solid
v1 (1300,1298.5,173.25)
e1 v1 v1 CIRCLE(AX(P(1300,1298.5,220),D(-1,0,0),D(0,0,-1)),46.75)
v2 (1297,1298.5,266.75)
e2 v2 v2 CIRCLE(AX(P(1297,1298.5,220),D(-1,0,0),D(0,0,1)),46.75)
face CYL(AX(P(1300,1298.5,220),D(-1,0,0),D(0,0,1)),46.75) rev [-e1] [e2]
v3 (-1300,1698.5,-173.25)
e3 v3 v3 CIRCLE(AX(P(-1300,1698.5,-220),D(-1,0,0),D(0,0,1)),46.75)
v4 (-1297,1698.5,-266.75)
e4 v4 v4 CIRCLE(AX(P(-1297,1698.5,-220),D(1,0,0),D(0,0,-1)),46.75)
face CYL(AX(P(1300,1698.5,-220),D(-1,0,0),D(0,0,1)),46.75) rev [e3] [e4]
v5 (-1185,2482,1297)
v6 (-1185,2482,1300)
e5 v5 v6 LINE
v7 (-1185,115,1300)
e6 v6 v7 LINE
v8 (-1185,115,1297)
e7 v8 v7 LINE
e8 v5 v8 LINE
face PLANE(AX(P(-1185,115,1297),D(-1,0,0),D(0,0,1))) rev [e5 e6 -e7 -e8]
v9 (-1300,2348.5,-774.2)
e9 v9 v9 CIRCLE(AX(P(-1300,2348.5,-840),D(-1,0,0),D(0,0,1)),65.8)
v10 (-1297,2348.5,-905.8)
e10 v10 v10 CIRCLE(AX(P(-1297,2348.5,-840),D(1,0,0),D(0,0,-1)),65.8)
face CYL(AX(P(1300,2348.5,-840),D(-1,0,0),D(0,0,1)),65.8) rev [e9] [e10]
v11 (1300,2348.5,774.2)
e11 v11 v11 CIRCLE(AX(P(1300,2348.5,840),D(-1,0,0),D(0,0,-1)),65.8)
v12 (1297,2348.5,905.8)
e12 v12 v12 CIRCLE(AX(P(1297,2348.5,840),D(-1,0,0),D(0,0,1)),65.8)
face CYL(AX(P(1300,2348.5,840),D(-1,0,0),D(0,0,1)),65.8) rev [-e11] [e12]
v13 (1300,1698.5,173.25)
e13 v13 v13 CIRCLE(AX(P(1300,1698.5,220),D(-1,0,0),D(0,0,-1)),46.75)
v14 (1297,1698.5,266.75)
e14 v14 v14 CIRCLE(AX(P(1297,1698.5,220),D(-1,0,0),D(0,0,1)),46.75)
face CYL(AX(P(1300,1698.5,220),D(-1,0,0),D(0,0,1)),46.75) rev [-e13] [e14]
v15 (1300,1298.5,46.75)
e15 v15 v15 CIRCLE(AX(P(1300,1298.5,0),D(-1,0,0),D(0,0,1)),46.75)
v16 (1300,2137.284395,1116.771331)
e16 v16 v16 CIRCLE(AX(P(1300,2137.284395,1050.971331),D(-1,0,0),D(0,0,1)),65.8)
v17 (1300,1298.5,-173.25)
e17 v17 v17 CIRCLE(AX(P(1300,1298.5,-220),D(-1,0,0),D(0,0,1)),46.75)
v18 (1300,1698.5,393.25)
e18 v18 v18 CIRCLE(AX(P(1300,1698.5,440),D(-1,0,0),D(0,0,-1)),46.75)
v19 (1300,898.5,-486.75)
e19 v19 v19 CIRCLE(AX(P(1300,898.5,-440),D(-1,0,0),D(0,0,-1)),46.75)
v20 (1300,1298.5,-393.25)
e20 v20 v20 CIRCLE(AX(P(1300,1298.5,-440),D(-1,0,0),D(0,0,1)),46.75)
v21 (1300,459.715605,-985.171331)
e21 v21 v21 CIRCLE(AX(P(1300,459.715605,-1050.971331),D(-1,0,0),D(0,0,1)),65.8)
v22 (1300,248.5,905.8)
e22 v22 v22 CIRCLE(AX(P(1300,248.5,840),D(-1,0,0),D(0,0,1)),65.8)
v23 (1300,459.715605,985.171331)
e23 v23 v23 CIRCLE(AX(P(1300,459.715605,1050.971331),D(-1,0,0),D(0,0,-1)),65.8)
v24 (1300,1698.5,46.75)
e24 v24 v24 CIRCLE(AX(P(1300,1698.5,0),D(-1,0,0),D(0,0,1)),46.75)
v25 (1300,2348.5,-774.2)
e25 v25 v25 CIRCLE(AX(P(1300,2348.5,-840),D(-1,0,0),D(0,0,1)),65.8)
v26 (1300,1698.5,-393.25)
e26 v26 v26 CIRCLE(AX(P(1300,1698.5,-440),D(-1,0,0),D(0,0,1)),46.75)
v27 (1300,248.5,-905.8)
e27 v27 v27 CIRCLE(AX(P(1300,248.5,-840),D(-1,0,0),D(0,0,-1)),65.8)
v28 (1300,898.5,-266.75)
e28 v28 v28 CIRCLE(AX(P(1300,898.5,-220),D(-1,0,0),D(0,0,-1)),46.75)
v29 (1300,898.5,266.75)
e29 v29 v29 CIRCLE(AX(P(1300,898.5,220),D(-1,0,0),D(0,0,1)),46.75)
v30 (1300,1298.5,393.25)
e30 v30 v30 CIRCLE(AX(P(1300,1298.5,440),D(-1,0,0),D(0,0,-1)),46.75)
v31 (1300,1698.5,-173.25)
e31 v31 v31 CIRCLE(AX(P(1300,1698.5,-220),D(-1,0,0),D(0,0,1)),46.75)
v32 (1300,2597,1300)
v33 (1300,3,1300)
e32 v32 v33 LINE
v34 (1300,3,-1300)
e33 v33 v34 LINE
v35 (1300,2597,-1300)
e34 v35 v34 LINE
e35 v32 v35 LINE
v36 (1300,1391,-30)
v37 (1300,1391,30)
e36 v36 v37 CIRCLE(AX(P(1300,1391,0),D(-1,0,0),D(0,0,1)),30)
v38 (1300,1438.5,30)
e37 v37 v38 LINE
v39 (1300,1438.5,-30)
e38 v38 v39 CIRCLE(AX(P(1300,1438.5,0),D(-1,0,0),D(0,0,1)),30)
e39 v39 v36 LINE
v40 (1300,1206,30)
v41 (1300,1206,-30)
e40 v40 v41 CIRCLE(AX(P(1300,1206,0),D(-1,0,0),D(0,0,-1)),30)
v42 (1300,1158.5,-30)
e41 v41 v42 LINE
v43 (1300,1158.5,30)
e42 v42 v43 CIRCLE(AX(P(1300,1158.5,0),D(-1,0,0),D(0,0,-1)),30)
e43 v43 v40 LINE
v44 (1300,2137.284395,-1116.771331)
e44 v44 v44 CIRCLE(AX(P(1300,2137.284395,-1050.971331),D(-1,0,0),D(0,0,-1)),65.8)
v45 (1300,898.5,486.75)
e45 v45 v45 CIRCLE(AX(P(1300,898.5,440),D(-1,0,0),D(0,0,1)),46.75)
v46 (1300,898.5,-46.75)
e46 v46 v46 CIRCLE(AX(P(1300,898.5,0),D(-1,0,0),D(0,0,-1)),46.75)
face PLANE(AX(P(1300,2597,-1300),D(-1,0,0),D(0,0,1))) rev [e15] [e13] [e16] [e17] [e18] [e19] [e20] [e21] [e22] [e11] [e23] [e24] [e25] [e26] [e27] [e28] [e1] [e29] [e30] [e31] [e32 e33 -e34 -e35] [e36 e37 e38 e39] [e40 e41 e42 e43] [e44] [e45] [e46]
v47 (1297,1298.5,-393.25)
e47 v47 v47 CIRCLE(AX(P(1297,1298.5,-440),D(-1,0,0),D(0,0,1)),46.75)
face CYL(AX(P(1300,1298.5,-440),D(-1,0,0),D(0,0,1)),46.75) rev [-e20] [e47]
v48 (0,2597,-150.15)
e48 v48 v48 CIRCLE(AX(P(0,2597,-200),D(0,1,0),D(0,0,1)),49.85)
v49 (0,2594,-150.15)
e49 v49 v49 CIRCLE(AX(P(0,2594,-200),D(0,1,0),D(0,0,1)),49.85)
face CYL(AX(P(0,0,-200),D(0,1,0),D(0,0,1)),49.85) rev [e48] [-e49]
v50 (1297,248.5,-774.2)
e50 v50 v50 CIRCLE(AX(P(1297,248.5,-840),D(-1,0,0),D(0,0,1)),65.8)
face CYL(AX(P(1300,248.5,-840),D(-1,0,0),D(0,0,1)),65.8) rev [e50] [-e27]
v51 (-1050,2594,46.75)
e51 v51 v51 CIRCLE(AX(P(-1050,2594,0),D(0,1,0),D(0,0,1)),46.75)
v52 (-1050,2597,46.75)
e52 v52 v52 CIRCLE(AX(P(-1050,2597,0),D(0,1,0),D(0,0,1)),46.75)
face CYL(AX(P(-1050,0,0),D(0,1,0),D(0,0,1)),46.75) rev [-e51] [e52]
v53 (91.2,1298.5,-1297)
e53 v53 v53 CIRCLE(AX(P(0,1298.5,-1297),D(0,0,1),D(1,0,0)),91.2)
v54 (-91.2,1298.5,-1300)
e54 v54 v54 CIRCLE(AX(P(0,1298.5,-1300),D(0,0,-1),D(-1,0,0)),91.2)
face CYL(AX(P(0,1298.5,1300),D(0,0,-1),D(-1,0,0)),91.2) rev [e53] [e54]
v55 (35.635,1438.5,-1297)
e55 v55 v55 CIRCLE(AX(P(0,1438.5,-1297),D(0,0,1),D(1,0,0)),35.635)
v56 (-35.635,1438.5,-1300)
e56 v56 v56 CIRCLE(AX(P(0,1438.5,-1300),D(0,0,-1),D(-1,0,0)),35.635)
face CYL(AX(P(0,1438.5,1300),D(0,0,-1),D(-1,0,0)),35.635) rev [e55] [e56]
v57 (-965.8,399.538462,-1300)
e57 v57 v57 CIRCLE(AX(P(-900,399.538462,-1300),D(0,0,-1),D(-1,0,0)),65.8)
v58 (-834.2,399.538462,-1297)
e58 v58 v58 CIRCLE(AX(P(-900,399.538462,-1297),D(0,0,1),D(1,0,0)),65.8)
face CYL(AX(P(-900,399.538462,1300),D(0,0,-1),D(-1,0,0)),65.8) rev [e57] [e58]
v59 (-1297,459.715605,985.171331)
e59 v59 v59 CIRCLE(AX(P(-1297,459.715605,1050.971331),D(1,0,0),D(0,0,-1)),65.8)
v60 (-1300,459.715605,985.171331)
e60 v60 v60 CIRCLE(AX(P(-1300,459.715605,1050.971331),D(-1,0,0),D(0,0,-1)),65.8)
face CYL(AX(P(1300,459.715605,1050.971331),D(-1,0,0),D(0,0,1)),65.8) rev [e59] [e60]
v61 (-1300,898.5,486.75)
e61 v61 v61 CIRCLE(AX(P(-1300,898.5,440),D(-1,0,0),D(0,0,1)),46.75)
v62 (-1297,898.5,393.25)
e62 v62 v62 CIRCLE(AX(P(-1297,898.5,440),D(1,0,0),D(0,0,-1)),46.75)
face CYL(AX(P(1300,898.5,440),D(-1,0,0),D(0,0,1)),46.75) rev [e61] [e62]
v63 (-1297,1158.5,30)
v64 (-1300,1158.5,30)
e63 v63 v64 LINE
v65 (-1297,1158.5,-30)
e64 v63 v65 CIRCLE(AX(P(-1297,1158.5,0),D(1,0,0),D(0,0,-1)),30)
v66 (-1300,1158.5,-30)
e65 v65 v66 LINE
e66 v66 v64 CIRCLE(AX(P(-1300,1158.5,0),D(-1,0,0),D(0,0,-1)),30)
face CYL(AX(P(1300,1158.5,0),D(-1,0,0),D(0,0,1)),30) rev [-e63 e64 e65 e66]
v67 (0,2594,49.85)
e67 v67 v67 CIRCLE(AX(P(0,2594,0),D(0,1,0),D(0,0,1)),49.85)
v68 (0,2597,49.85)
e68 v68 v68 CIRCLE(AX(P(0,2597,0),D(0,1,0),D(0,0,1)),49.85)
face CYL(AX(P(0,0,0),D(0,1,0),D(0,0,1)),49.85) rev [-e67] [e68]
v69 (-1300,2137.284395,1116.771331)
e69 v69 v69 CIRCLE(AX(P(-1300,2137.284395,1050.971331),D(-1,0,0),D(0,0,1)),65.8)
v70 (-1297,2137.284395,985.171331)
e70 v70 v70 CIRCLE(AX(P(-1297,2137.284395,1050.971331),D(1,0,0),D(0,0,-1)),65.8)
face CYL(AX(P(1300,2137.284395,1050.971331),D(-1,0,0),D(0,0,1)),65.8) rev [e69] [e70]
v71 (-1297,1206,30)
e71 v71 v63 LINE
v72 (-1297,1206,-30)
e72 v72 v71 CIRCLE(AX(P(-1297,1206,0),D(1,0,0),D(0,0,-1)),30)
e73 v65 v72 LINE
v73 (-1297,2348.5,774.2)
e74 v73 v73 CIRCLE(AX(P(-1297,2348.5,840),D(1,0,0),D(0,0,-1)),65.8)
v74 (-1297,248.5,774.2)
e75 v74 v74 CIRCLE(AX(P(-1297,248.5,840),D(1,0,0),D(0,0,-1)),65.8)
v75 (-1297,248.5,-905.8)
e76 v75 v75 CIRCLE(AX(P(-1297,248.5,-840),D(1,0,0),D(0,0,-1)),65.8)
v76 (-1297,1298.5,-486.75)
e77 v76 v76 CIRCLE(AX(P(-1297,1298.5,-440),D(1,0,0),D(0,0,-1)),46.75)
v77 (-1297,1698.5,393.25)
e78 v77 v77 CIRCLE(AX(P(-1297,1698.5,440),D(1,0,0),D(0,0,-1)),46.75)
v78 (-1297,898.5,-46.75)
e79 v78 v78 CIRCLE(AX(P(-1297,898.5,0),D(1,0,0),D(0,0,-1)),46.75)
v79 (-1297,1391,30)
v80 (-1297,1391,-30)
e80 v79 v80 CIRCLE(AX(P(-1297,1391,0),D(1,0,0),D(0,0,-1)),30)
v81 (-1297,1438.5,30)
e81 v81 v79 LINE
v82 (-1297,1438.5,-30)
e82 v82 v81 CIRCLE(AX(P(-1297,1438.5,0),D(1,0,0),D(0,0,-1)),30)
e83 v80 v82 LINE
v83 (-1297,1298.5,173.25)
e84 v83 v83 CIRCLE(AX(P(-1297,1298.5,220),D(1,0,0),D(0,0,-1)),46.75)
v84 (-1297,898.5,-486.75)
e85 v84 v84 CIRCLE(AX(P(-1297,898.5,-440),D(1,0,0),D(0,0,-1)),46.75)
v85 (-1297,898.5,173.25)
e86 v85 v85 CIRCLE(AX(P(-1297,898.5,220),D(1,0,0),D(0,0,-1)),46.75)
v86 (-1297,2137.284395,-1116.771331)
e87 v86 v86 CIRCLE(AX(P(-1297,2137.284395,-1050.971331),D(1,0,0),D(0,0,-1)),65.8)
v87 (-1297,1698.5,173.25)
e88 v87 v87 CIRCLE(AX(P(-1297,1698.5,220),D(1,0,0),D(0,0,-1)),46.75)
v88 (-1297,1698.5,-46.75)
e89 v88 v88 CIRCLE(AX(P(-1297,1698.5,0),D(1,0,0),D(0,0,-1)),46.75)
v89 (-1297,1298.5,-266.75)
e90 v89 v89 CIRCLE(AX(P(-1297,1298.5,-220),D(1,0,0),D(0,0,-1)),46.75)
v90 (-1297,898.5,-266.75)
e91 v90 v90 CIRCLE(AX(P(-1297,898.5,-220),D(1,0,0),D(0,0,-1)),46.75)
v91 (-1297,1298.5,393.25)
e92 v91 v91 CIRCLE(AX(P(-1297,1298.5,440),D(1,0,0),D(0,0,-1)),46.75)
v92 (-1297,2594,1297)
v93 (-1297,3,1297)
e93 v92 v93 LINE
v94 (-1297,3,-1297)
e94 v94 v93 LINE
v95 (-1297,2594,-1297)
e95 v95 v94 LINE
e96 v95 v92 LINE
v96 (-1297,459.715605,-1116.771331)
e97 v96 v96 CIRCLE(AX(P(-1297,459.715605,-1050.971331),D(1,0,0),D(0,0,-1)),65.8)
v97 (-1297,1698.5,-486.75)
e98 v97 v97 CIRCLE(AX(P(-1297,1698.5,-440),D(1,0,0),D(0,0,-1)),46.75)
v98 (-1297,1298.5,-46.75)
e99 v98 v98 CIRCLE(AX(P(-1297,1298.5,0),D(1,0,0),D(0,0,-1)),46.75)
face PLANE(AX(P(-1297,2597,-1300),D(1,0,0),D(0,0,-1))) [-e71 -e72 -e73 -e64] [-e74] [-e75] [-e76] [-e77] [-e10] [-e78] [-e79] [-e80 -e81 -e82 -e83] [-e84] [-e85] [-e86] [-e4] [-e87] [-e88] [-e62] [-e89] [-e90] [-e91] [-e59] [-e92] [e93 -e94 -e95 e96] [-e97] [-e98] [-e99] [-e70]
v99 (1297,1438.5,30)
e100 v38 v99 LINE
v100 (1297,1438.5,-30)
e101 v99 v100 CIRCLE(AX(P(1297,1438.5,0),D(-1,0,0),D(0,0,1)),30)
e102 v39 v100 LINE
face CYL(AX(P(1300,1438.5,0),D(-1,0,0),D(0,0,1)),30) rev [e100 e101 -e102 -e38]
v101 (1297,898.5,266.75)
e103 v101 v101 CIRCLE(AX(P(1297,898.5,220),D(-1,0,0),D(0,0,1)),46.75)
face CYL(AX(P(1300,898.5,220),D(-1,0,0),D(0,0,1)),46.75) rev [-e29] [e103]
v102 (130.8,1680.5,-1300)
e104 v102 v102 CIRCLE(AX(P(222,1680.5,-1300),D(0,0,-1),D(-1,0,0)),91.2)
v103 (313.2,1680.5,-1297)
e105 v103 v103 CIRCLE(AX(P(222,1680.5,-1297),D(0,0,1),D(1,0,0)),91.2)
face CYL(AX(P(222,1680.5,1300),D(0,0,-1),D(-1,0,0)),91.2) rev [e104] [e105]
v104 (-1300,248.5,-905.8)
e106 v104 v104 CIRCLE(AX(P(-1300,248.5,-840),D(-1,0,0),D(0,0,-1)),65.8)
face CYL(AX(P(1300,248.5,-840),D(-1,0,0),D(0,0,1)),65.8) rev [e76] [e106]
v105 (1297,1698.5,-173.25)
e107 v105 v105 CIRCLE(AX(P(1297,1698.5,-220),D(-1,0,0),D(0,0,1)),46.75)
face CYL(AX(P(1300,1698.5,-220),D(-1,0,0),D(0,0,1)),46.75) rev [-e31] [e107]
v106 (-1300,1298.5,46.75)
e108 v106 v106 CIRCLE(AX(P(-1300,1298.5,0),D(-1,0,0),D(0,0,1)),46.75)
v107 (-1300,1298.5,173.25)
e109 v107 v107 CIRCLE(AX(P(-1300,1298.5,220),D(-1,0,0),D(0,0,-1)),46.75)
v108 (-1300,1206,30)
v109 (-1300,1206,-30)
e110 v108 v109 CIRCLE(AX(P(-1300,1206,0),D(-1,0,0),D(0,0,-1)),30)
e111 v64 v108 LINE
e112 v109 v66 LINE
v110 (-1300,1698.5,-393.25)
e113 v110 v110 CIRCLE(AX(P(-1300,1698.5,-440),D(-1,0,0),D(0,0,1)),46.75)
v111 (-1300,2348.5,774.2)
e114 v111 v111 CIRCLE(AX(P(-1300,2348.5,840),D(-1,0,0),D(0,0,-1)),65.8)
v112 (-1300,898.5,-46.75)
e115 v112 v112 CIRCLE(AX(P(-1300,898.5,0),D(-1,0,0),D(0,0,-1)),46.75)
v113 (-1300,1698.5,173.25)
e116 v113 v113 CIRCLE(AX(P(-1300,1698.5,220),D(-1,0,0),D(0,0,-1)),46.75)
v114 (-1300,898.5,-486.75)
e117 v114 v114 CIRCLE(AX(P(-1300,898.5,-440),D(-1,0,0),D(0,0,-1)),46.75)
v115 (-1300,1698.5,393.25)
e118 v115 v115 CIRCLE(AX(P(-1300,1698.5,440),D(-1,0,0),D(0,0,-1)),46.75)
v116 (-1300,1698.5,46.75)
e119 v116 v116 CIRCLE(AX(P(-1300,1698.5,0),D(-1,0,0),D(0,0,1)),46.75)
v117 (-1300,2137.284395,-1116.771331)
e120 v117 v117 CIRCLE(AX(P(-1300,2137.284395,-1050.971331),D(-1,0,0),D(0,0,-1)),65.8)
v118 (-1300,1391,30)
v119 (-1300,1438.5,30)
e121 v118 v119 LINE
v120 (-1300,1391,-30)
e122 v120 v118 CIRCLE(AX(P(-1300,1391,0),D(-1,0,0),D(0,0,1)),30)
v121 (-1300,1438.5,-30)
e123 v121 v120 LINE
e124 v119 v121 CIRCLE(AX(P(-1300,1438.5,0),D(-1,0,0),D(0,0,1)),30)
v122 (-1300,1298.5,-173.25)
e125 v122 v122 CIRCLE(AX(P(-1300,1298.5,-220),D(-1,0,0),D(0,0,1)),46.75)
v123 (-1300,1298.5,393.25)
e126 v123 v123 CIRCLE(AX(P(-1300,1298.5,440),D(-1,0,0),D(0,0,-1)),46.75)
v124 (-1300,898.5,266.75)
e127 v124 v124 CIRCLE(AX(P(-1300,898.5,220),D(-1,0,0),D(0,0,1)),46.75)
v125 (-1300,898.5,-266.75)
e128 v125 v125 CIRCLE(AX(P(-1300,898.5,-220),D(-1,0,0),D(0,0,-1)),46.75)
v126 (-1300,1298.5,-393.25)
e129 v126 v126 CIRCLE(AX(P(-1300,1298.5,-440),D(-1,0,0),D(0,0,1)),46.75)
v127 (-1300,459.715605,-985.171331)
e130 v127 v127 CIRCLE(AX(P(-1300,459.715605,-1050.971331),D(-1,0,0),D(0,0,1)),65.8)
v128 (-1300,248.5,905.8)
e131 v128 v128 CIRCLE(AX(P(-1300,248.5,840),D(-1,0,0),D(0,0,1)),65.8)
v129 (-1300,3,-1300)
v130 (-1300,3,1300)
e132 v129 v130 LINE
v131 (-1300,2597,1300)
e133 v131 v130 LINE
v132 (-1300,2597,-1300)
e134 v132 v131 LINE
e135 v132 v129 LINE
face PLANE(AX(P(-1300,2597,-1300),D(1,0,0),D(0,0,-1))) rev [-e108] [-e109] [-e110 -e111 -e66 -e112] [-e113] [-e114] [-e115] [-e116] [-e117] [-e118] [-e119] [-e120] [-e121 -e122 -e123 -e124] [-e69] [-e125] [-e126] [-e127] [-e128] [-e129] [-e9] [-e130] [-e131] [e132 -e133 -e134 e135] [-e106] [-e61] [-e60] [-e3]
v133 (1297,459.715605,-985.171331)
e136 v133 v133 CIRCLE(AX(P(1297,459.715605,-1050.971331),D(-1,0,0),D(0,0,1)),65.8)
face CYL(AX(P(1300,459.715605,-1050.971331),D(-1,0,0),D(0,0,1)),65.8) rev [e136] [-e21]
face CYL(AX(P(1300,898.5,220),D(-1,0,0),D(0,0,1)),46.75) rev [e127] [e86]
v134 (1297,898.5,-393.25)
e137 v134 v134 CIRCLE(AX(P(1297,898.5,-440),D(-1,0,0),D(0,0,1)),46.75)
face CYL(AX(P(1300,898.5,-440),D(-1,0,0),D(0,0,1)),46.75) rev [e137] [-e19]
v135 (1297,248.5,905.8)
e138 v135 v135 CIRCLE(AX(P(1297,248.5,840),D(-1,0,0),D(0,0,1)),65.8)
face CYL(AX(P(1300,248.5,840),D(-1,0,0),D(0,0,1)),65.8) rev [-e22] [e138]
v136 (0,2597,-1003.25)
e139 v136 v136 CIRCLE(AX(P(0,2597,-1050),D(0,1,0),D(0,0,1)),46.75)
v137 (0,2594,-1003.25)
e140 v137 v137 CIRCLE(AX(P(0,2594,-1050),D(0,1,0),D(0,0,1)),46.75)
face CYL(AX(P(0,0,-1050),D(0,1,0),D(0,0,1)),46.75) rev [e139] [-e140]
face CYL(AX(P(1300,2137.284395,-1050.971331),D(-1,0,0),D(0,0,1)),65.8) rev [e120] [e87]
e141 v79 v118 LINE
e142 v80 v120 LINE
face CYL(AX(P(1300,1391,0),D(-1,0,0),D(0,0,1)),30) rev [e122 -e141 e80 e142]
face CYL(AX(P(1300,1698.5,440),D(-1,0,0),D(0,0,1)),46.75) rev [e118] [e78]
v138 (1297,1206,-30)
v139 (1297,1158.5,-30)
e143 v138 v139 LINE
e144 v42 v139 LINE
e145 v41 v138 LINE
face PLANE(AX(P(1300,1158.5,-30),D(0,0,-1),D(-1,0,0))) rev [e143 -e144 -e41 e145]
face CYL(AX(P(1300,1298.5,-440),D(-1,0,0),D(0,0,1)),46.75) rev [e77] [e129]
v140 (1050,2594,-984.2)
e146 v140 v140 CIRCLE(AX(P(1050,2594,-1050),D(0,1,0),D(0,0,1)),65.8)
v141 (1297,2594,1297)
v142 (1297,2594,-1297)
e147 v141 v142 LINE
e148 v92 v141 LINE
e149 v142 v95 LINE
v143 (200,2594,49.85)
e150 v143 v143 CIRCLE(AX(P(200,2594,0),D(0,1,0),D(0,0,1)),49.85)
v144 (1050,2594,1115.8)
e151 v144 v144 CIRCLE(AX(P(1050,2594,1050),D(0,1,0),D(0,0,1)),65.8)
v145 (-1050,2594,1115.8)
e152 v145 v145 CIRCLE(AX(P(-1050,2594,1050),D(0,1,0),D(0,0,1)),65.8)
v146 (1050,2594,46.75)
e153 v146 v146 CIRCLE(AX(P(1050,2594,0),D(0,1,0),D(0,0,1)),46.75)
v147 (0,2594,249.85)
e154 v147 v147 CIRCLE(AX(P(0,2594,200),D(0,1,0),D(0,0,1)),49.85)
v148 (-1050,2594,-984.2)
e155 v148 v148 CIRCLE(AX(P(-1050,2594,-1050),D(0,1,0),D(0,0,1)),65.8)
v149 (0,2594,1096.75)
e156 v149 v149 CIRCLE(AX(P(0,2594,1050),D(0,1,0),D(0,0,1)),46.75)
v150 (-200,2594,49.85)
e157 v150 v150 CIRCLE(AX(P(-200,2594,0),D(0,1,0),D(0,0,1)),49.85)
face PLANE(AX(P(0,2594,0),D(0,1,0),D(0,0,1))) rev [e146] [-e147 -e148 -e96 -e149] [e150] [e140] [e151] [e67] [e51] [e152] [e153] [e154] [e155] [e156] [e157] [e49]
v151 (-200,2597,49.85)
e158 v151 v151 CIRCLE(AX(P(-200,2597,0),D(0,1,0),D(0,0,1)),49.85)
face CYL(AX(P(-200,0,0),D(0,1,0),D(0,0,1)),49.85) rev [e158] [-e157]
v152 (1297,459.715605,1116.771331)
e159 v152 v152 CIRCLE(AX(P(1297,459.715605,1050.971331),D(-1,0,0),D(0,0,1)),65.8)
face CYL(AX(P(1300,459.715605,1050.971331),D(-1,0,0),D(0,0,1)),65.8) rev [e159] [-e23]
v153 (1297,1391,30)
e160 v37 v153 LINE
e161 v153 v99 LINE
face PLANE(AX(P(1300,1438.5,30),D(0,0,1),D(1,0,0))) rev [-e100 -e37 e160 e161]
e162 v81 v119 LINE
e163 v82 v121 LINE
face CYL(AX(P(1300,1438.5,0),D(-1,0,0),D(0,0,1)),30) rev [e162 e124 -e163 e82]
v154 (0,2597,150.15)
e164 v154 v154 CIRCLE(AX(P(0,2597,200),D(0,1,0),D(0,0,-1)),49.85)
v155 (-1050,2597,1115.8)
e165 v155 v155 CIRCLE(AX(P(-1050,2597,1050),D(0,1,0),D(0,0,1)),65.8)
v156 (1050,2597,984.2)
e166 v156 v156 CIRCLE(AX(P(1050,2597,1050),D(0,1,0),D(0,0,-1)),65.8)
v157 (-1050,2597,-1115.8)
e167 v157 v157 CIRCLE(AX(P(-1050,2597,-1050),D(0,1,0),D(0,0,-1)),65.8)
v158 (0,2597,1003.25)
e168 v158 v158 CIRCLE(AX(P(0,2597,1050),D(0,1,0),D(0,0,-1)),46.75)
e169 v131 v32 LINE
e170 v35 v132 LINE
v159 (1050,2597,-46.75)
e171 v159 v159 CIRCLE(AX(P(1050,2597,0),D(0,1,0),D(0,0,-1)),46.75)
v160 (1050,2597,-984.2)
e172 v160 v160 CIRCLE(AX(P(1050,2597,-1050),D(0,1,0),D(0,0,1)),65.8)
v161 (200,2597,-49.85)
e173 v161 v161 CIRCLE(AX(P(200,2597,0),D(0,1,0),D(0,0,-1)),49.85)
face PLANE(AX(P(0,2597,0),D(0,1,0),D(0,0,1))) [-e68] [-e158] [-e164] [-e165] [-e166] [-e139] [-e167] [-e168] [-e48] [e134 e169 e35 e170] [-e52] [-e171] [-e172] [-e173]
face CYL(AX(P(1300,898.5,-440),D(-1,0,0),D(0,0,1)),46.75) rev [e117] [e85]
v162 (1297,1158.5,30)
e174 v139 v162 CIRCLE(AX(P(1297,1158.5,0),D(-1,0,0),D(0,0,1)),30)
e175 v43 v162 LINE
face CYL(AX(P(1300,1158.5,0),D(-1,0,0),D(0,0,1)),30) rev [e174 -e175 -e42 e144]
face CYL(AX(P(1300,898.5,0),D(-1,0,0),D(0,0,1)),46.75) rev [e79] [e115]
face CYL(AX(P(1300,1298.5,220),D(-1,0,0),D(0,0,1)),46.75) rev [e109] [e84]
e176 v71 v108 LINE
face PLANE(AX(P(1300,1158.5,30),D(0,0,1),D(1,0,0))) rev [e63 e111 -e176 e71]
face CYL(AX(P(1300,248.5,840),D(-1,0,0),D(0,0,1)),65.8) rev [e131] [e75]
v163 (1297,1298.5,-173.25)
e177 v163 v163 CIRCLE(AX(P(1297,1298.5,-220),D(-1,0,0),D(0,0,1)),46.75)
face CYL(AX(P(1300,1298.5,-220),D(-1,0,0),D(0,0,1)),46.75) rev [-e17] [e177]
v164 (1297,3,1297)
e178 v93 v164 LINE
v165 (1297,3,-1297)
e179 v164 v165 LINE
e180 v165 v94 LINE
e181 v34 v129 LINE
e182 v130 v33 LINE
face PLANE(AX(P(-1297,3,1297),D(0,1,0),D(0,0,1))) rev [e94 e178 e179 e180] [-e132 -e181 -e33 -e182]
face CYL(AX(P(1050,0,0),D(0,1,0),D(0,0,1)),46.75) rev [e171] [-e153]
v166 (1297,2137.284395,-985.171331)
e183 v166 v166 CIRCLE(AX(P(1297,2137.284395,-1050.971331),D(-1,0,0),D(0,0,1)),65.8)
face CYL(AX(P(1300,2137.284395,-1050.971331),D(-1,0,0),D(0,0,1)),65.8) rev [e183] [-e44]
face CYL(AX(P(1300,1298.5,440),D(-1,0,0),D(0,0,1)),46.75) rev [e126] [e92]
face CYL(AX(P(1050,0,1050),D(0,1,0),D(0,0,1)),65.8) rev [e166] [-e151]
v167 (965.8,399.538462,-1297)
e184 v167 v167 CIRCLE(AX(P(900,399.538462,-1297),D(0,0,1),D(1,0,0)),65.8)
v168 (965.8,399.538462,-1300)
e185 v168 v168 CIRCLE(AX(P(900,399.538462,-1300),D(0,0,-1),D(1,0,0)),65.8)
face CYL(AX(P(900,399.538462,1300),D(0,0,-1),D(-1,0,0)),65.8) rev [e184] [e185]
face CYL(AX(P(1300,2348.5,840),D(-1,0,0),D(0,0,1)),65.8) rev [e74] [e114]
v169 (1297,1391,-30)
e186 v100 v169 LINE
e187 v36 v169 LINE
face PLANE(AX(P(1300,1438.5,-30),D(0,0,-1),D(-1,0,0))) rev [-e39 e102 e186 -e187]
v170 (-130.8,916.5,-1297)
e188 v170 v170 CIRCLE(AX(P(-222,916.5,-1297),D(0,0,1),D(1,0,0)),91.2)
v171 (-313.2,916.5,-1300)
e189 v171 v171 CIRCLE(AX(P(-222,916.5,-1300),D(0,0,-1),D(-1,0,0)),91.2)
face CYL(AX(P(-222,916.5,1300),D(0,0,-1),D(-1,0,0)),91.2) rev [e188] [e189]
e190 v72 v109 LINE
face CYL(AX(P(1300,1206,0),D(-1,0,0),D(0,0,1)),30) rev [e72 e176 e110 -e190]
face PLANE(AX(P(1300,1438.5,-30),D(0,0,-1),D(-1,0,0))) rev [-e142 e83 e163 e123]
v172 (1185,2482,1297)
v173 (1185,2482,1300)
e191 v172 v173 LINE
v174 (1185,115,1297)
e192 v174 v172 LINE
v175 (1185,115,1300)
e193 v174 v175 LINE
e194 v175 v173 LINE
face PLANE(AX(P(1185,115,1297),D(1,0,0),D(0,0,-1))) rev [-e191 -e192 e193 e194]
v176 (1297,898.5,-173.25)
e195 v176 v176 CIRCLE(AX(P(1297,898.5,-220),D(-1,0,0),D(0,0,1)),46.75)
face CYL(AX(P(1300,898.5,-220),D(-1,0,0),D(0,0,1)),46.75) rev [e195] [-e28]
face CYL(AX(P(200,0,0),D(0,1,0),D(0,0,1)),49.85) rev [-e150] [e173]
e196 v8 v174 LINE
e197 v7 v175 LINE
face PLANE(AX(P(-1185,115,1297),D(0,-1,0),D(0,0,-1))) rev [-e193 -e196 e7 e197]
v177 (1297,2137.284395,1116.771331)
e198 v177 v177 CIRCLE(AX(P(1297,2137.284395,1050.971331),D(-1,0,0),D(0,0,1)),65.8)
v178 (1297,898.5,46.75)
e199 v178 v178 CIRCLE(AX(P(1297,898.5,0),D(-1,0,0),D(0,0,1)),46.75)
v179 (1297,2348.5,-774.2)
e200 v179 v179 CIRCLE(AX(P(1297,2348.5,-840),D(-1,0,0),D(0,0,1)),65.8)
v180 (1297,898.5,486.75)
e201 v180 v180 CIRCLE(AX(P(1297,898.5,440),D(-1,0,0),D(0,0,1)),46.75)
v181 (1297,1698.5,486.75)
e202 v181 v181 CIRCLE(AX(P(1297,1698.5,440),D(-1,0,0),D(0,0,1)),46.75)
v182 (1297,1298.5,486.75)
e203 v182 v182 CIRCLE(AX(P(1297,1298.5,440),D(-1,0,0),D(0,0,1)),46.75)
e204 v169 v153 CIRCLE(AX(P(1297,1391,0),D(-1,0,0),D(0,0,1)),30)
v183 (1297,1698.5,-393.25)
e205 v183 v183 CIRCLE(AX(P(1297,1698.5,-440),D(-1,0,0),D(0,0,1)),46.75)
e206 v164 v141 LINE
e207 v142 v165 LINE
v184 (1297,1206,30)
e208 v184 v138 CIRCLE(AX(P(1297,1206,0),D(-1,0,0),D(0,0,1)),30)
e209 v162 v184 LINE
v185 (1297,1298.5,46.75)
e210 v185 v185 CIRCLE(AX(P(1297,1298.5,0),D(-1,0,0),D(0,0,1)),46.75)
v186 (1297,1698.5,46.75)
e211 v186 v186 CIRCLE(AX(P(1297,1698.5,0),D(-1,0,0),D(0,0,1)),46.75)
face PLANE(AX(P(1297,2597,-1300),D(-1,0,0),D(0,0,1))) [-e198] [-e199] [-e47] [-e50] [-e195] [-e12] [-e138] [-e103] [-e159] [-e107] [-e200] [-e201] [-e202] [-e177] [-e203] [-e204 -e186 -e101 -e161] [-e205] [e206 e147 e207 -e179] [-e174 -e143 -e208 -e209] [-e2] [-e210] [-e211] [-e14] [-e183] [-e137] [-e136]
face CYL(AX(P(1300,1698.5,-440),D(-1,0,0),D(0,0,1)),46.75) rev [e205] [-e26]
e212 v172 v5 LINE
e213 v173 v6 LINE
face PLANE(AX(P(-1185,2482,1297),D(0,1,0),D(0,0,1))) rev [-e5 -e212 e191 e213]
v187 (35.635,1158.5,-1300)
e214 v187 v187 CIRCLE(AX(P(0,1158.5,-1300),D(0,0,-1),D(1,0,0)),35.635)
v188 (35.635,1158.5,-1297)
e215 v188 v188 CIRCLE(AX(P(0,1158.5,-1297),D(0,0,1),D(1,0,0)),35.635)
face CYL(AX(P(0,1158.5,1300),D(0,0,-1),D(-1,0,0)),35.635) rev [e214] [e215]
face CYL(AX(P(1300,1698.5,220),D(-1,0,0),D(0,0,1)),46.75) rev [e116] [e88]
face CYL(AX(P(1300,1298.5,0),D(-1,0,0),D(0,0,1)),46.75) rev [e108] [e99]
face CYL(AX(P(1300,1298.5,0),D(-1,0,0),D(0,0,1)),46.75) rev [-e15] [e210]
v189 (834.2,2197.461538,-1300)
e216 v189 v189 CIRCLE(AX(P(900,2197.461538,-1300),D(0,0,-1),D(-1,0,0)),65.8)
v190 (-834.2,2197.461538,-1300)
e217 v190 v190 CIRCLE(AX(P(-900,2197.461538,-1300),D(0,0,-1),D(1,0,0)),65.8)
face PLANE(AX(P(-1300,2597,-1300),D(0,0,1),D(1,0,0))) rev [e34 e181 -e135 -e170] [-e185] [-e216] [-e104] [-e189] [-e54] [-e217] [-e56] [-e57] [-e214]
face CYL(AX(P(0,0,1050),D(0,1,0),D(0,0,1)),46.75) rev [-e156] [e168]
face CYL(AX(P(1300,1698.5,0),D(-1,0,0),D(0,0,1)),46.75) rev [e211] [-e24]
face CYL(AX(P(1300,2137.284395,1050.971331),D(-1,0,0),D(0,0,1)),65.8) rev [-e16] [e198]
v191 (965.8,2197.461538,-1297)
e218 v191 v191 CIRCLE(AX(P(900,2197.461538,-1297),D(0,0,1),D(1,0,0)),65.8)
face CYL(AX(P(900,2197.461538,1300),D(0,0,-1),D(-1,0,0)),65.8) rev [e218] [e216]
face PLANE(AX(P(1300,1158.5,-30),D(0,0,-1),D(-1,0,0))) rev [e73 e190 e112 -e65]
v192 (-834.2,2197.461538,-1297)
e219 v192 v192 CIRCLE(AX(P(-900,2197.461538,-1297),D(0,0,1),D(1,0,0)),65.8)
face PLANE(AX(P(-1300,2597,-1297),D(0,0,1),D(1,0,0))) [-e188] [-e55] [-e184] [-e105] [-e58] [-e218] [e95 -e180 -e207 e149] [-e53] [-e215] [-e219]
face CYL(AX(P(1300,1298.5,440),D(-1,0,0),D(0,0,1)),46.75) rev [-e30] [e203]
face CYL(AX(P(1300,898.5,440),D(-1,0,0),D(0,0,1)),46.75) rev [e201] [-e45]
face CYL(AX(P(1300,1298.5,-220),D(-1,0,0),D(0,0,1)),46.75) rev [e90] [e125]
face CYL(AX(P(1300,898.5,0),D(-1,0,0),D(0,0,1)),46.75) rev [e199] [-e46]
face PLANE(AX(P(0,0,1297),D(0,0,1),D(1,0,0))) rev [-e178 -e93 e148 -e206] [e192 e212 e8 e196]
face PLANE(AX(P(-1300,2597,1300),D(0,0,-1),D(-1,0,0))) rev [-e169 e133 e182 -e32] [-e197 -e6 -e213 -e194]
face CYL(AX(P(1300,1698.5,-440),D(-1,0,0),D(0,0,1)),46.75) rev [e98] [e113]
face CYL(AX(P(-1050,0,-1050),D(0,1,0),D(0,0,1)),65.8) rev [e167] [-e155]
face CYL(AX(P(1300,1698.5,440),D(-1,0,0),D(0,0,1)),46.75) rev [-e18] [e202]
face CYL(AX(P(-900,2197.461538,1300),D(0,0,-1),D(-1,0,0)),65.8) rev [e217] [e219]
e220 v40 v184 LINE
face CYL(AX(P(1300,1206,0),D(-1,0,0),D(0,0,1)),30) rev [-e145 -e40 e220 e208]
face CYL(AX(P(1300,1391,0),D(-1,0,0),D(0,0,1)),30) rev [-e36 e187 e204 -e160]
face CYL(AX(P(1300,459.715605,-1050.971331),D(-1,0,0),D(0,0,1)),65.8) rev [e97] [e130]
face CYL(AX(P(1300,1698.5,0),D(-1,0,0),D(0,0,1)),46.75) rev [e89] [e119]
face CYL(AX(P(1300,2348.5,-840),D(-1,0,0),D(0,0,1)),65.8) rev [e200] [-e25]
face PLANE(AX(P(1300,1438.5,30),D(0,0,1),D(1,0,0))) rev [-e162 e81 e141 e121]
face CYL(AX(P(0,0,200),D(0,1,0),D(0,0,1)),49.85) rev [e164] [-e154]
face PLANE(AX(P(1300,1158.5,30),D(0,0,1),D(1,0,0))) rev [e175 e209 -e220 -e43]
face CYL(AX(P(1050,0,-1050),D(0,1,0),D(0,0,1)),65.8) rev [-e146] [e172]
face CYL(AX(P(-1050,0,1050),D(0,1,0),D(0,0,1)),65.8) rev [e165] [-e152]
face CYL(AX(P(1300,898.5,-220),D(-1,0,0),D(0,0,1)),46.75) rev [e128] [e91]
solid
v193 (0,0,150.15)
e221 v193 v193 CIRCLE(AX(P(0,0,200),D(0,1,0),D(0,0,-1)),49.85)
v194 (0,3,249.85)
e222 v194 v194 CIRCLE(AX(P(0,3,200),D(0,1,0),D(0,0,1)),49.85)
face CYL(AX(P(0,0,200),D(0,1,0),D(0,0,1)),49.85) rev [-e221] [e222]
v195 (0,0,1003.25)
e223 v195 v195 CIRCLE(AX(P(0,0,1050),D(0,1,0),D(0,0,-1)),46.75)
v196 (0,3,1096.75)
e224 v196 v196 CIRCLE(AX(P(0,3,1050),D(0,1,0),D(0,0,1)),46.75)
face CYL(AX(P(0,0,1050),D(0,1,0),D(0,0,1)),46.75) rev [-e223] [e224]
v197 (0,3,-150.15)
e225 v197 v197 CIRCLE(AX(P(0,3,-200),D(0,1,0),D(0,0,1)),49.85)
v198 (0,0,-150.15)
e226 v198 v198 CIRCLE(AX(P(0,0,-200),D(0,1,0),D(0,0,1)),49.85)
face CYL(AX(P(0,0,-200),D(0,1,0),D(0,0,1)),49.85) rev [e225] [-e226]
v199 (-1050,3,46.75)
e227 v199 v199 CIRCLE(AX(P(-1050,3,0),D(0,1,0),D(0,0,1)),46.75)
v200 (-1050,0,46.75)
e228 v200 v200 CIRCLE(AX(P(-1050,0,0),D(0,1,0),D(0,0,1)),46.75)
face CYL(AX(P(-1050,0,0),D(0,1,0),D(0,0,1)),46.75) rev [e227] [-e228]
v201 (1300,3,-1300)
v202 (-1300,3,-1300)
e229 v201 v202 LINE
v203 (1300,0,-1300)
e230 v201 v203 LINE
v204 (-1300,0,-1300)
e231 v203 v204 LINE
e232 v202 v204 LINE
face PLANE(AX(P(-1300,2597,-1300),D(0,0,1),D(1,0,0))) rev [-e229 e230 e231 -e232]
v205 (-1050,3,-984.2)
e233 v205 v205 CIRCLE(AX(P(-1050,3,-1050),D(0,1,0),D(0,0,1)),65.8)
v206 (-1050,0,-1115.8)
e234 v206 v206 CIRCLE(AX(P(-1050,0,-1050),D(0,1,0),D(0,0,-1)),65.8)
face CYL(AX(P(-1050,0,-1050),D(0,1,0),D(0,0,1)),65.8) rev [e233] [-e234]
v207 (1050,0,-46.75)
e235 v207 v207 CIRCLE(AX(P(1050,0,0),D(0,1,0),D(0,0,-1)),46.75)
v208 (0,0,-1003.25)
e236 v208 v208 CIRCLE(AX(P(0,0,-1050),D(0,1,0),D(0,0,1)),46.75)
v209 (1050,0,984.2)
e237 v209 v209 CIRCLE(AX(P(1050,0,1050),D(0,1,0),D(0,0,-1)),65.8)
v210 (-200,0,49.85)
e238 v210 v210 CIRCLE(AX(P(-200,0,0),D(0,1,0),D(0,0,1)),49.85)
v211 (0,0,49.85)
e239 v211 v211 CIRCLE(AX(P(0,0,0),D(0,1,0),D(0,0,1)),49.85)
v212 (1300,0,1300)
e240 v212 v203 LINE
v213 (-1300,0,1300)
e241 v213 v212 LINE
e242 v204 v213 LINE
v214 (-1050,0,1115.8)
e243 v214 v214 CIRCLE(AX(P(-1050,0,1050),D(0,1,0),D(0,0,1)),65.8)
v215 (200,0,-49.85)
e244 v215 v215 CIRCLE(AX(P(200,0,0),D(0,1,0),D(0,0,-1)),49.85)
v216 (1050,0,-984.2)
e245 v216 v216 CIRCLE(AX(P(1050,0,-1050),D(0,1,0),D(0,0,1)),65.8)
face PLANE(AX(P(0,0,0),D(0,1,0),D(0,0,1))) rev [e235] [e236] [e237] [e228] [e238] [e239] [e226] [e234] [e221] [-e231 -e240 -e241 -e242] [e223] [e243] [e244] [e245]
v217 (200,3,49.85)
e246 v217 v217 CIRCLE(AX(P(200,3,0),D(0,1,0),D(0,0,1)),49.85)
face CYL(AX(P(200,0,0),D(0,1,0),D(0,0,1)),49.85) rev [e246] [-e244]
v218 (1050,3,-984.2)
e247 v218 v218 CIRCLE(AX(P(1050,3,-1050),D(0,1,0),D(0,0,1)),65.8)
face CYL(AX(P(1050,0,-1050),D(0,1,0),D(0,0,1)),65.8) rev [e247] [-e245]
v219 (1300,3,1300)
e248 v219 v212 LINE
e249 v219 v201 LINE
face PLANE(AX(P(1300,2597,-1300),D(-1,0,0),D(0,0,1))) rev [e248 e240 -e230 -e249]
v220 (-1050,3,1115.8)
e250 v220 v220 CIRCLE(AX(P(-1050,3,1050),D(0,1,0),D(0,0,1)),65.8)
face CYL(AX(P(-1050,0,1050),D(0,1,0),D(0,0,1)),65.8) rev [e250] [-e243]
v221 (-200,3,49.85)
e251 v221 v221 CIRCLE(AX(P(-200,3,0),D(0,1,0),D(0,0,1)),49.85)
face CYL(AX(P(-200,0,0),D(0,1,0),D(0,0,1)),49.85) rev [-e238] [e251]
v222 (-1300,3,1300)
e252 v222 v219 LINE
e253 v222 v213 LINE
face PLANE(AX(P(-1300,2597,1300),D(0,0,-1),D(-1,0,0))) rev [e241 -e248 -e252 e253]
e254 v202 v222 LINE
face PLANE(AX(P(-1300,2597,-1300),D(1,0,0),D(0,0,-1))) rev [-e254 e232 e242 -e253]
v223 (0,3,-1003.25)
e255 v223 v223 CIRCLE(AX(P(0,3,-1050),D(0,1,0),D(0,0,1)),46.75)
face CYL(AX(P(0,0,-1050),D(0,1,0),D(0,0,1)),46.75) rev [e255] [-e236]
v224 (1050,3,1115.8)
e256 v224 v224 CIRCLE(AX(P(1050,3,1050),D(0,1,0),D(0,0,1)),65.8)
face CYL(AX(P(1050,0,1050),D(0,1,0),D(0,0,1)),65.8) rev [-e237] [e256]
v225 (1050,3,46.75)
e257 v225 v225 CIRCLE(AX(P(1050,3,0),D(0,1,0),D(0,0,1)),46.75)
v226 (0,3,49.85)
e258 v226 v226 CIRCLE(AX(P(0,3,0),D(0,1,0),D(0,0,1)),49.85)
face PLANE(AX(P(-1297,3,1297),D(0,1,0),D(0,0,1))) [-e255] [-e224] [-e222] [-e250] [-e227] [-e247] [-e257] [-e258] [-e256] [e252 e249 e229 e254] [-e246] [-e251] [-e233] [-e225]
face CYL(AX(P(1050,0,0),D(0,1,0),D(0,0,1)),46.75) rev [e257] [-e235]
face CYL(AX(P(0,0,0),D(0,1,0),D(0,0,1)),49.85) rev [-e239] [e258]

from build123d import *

# Parameters (mm, degrees)
SKETCH1_W           = 2600
SKETCH1_H           = 2600
BOSS_EXTRUDE1_DEPTH = 2597
SHELL1_T            = -3
SKETCH3_W           = 2600
SKETCH3_H           = 2597
SKETCH3_W_2         = 2370
SKETCH3_H_2         = 2367
BOSS_EXTRUDE2_DEPTH = 3
SKETCH4_R           = 49.85
SKETCH4_R_2         = 46.75
SKETCH4_R_3         = 65.8
CUT_EXTRUDE1_DEPTH  = 3182.887647294
SKETCH5_R           = 91.2
SKETCH5_R_2         = 35.635
SKETCH5_R_3         = 65.8
CUT_EXTRUDE2_DEPTH  = 3899.000641354
SKETCH6_R           = 46.75
SKETCH6_R_2         = 65.8
CUT_EXTRUDE3_DEPTH  = 3899.000641354


with BuildPart() as part:
    # Sketch1 → Boss-Extrude1 (new body)
    with BuildSketch(Plane(origin=(0, 0, 0), x_dir=(1, 0, 0), z_dir=(0, 1, 0))):
        Rectangle(SKETCH1_W, SKETCH1_H)
    extrude(amount=BOSS_EXTRUDE1_DEPTH)

    # Shell1
    shell1_openings = [part.faces().sort_by_distance(p)[0] for p in [
        (0, 1298.5, 1300),
    ]]
    offset(amount=SHELL1_T, openings=shell1_openings, kind=Kind.INTERSECTION)

    # Sketch3 → Boss-Extrude2 (add)
    with BuildSketch(Plane.XY.offset(1300)):
        with Locations((0, 1298.5)):
            Rectangle(SKETCH3_W, SKETCH3_H)
        with Locations((0, 1298.5)):
            Rectangle(SKETCH3_W_2, SKETCH3_H_2, mode=Mode.SUBTRACT)
    extrude(amount=-BOSS_EXTRUDE2_DEPTH)

    # Sketch4 → Cut-Extrude1 (cut, through all)
    with BuildSketch(Plane(origin=(0, 2597, 0), x_dir=(1, 0, 0), z_dir=(0, 1, 0))):
        Circle(SKETCH4_R)
        with Locations((0, 200)):
            Circle(SKETCH4_R)
        with Locations((0, 1050)):
            Circle(SKETCH4_R_2)
        with Locations((1050, 1050)):
            Circle(SKETCH4_R_3)
        with Locations((200, 0)):
            Circle(SKETCH4_R)
        with Locations((1050, 0)):
            Circle(SKETCH4_R_2)
        with Locations((1050, -1050)):
            Circle(SKETCH4_R_3)
        with Locations((0, -200)):
            Circle(SKETCH4_R)
        with Locations((0, -1050)):
            Circle(SKETCH4_R_2)
        with Locations((-1050, -1050)):
            Circle(SKETCH4_R_3)
        with Locations((-1050, 0)):
            Circle(SKETCH4_R_2)
        with Locations((-200, 0)):
            Circle(SKETCH4_R)
        with Locations((-1050, 1050)):
            Circle(SKETCH4_R_3)
    extrude(amount=-CUT_EXTRUDE1_DEPTH, mode=Mode.SUBTRACT)

    # Sketch5 → Cut-Extrude2 (cut, through all)
    with BuildSketch(Plane(origin=(0, 0, -1300), x_dir=(-1, 0, 0), z_dir=(0, 0, -1))):
        with Locations((0, 1298.5)):
            Circle(SKETCH5_R)
        with Locations((0, 1438.5)):
            Circle(SKETCH5_R_2)
        with Locations((-222, 1680.5)):
            Circle(SKETCH5_R)
        with Locations((222, 916.5)):
            Circle(SKETCH5_R)
        with Locations((-900, 2197.461538462)):
            Circle(SKETCH5_R_3)
        with Locations((0, 1158.5)):
            Circle(SKETCH5_R_2)
        with Locations((-900, 399.538461538)):
            Circle(SKETCH5_R_3)
        with Locations((900, 399.538461538)):
            Circle(SKETCH5_R_3)
        with Locations((900, 2197.461538462)):
            Circle(SKETCH5_R_3)
    extrude(amount=-CUT_EXTRUDE2_DEPTH, mode=Mode.SUBTRACT)

    # Sketch6 → Cut-Extrude3 (cut, through all)
    with BuildSketch(Plane.ZY.offset(1300)):
        with Locations((0, 1298.5)):
            Circle(SKETCH6_R)
        with Locations((0, 1698.5)):
            Circle(SKETCH6_R)
        with Locations((-220, 1698.5)):
            Circle(SKETCH6_R)
        with Locations((-220, 1298.5)):
            Circle(SKETCH6_R)
        with Locations((-440, 1698.5)):
            Circle(SKETCH6_R)
        with Locations((-440, 1298.5)):
            Circle(SKETCH6_R)
        with Locations((-840, 2348.5)):
            Circle(SKETCH6_R_2)
        with Locations((-1050.971331376, 2137.284394601)):
            Circle(SKETCH6_R_2)
        with Locations((220, 1298.5)):
            Circle(SKETCH6_R)
        with Locations((440, 1298.5)):
            Circle(SKETCH6_R)
        with Locations((440, 1698.5)):
            Circle(SKETCH6_R)
        with Locations((220, 1698.5)):
            Circle(SKETCH6_R)
        with Locations((1050.971331376, 2137.284394601)):
            Circle(SKETCH6_R_2)
        with Locations((840, 2348.5)):
            Circle(SKETCH6_R_2)
        with Locations((-440, 898.5)):
            Circle(SKETCH6_R)
        with Locations((-220, 898.5)):
            Circle(SKETCH6_R)
        with Locations((0, 898.5)):
            Circle(SKETCH6_R)
        with Locations((220, 898.5)):
            Circle(SKETCH6_R)
        with Locations((440, 898.5)):
            Circle(SKETCH6_R)
        with Locations((1050.971331376, 459.715605399)):
            Circle(SKETCH6_R_2)
        with Locations((840, 248.5)):
            Circle(SKETCH6_R_2)
        with Locations((-840, 248.5)):
            Circle(SKETCH6_R_2)
        with Locations((-1050.971331376, 459.715605399)):
            Circle(SKETCH6_R_2)
        with BuildLine():
            Line((30, 1438.5), (30, 1391))
            ThreePointArc((30, 1391), (0, 1361), (-30, 1391))
            Line((-30, 1391), (-30, 1438.5))
            ThreePointArc((-30, 1438.5), (0, 1468.5), (30, 1438.5))
        make_face()
        with BuildLine():
            Line((30, 1158.5), (30, 1206))
            ThreePointArc((30, 1206), (0, 1236), (-30, 1206))
            Line((-30, 1206), (-30, 1158.5))
            ThreePointArc((-30, 1158.5), (0, 1128.5), (30, 1158.5))
        make_face()
    extrude(amount=-CUT_EXTRUDE3_DEPTH, mode=Mode.SUBTRACT)


with BuildPart() as body_2:
    # Split1: the piece on the far side of the plane
    add(part.part)
    split(bisect_by=Plane.ZX.offset(3), keep=Keep.BOTTOM)


with BuildPart() as part_1:
    add(part.part)

    # Split1
    split(bisect_by=Plane.ZX.offset(3), keep=Keep.TOP)


solid = Compound([body_2.part, part_1.part])
